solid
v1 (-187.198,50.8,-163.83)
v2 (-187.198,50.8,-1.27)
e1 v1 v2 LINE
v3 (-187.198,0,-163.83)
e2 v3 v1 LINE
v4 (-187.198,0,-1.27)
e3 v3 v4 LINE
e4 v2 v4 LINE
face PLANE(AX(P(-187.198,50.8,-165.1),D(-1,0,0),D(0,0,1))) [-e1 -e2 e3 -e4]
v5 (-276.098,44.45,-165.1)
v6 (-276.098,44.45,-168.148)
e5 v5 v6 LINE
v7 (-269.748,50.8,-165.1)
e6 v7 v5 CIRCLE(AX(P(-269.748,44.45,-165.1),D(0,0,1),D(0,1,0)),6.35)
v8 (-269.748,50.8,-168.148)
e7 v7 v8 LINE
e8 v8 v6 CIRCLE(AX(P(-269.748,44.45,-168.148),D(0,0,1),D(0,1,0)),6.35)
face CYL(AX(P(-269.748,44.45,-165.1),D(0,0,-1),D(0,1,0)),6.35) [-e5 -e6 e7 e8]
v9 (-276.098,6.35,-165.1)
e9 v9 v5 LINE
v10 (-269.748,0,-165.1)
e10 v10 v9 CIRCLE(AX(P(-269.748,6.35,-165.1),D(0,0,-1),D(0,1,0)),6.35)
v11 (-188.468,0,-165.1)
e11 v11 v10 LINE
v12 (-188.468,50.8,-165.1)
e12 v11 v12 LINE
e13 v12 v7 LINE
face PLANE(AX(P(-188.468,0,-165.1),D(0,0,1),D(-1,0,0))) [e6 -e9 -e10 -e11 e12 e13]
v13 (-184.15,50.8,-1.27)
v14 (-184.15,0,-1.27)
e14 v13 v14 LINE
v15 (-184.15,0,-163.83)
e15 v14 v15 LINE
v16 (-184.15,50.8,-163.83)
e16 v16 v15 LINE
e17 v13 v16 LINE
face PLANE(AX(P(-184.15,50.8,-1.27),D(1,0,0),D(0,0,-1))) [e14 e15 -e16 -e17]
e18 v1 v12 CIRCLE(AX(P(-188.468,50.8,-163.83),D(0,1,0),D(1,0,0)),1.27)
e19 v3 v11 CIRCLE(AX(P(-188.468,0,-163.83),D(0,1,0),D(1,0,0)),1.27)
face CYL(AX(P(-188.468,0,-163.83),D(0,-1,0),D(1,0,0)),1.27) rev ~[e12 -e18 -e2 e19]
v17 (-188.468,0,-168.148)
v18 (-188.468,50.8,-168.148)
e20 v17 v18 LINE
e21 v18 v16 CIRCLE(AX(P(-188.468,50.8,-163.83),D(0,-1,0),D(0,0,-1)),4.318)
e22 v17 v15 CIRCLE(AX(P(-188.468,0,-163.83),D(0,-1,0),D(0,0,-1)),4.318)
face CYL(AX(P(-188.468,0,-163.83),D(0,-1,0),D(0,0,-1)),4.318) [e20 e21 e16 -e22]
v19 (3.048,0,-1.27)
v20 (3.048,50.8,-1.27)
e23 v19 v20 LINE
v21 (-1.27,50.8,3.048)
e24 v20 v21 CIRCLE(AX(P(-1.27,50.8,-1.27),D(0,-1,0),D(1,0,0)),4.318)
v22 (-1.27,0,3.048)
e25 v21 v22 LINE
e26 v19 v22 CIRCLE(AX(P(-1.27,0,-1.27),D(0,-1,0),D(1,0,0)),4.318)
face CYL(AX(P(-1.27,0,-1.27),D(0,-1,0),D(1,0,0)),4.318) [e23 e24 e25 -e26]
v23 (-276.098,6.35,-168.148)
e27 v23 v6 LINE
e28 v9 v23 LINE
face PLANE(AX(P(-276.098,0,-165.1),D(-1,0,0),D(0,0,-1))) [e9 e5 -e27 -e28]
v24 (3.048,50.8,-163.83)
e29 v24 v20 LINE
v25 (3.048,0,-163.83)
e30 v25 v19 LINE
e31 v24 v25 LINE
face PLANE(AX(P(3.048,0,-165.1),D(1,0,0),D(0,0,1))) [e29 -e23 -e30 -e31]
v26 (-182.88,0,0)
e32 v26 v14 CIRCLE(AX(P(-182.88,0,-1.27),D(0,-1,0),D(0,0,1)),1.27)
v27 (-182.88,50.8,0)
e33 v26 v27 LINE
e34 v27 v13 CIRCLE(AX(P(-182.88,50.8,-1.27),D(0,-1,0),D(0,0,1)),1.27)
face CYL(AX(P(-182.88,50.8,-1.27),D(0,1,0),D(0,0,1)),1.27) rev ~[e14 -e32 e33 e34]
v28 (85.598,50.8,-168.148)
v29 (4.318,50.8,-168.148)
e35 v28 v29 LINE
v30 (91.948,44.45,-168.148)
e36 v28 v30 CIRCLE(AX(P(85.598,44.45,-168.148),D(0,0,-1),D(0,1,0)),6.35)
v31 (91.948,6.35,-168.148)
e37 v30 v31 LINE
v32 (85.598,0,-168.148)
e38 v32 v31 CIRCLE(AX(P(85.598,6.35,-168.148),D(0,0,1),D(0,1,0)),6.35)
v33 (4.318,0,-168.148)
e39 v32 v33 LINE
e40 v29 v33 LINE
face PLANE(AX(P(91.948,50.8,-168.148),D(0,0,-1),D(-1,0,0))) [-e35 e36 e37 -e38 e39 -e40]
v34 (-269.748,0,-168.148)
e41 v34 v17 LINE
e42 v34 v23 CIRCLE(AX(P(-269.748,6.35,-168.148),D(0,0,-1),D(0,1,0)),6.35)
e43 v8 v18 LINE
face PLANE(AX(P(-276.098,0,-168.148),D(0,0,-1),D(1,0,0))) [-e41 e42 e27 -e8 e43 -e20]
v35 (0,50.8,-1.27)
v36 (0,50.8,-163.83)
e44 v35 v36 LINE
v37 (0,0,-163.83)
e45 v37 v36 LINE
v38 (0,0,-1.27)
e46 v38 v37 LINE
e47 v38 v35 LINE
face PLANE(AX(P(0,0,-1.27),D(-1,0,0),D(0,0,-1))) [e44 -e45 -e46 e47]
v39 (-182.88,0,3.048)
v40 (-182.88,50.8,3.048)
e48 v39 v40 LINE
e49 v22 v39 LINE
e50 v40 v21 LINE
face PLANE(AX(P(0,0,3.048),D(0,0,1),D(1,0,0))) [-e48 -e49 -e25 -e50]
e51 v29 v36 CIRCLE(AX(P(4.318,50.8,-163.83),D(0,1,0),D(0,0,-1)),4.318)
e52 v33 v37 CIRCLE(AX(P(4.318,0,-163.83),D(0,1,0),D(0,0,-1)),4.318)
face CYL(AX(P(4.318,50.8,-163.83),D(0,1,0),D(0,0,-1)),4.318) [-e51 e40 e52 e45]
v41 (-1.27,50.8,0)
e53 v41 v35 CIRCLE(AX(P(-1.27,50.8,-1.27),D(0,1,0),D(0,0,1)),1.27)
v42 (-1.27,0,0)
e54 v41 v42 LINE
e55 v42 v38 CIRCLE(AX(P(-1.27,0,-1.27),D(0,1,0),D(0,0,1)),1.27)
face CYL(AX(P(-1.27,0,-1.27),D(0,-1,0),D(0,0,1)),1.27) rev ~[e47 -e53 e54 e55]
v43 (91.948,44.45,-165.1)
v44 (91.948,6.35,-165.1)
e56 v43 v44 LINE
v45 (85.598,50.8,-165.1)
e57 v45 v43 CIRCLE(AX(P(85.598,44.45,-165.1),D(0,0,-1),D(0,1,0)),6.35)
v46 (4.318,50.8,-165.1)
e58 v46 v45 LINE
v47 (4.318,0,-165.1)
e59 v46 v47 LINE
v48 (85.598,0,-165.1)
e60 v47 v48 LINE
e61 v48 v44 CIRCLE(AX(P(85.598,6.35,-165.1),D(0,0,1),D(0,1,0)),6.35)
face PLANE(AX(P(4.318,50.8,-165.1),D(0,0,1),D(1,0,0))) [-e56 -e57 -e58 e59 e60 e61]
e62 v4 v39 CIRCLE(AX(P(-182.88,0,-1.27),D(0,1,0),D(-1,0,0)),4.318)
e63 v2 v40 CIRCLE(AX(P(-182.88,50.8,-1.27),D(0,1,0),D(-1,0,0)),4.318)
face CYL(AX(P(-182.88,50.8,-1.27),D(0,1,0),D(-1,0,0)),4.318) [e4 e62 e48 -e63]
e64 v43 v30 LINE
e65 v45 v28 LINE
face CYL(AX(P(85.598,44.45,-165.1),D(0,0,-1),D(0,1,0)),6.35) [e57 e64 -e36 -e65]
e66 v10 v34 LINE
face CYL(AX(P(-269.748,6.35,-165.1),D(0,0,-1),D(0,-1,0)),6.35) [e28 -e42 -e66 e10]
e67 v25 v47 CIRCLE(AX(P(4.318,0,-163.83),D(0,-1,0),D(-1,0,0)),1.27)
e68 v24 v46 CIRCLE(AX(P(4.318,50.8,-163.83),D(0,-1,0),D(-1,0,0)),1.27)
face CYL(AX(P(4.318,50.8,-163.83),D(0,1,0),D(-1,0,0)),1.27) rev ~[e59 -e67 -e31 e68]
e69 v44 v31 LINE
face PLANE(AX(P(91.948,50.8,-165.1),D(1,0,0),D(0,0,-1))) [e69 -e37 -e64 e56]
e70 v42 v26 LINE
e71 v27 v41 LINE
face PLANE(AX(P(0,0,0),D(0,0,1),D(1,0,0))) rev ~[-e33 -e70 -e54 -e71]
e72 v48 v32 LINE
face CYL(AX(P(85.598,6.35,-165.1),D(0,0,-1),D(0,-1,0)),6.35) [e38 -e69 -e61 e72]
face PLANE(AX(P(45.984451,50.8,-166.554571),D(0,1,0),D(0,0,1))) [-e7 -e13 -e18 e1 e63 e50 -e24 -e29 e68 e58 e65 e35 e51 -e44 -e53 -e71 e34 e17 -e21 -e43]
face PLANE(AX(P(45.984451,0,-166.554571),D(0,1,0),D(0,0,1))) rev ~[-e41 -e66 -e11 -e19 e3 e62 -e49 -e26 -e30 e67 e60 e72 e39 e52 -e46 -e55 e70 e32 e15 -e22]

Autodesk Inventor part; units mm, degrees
ref_plane "YZ Plane" through (0, 0, 0) normal (1, 0, 0) x (0, 1, 0)
ref_plane "XZ Plane" through (0, 0, 0) normal (0, 1, 0) x (-1, 0, 0)
ref_plane "XY Plane" through (0, 0, 0) normal (0, 0, 1) x (1, 0, 0)
sketch "Sketch1" plane through (0, 0, 0) normal (0, 0, 1) x (1, 0, 0)
  line L0 (0, 0) -> (-184.15, 0)
  line L1 (-184.15, 0) -> (-184.15, 50.8)
  line L2 (-184.15, 50.8) -> (0, 50.8)
  line L3 (0, 50.8) -> (0, 0)
  dimension "d0" = 184.15
  dimension "d1" = 50.8
extrude "Plate1" add sketch "Sketch1" along normal blind 3.048
sketch "Sketch2" plane through (0, 0, 0) normal (1, 0, 0) x (0, 1, 0)
  line L0 (50.8, 0) -> (0, 0)
  line L1 (0, 0) -> (0, -165.1)
  line L2 (0, -165.1) -> (50.8, -165.1)
  line L3 (50.8, -165.1) -> (50.8, 0)
edge flange "Flange1" height 165.1 angle 90 thickness 3.048 bend radius 1.27 thickness toward (1, 0, 0) relief tear relief width 3.048 relief depth 1.524 corner gap 3.048 corner form 0 edges at (0, 25.4, 0) (-184.15, 25.4, 0) wall of the first edge with corners at (0, 50.8, 0) (0, 0, 0) (0, 0, -165.1) (0, 50.8, -165.1)
bend "Bend1"
corner "Corner1"
sketch "Sketch3" plane through (3.048, 50.8, -165.1) normal (0, 0, -1) x (-1, 0, 0)
  line L0 (0, -50.8) -> (0, 0)
  line L1 (0, 0) -> (-88.9, 0)
  line L2 (-88.9, 0) -> (-88.9, -50.8)
  line L3 (-88.9, -50.8) -> (0, -50.8)
edge flange "Flange2" height 88.9 angle 90 thickness 3.048 bend radius 1.27 thickness toward (0, 0, -1) relief tear relief width 3.048 relief depth 1.524 corner gap 3.048 corner form 0 edges at (3.048, 25.4, -165.1) (-187.198, 25.4, -165.1) wall of the first edge with corners at (3.048, 0, -165.1) (3.048, 50.8, -165.1) (91.948, 50.8, -165.1) (91.948, 0, -165.1)
bend "Bend2"
corner "Corner2"
fillet "Corner Round1" radius 6.35 4 edges at (-276.098, 0, -166.624) (-276.098, 50.8, -166.624) (91.948, 0, -166.624) (91.948, 50.8, -166.624)
equation "\"d3\" = BendReliefWidth"
equation "\"d4\" = BendReliefDepth"
equation "\"d5\" = MinimumRemnant"
equation "\"d6\" = BendRadius"
equation "\"d10\" = CornerReliefSize"
equation "\"d11\" = GapSize"
equation "\"d12\" = JacobiRadiusSize"
equation "\"d13\" = BendReliefWidth"
equation "\"d14\" = BendReliefDepth"
equation "\"d15\" = MinimumRemnant"
equation "\"d16\" = BendRadius"
equation "\"d20\" = CornerReliefSize"
equation "\"d21\" = GapSize"
equation "\"d22\" = JacobiRadiusSize"
equation "\"BendRadius\" = Thickness"
equation "\"BendReliefWidth\" = Thickness"
equation "\"BendReliefDepth\" = 0.5 * Thickness"
equation "\"CornerReliefSize\" = 4 * Thickness"
equation "\"MinimumRemnant\" = 2 * Thickness"
equation "\"TransitionRadius\" = BendRadius"
equation "\"JacobiRadiusSize\" = BendRadius"
equation "\"GapSize\" = Thickness"
equation "\"d2\" = BendRadius"
equation "\"Thickness\" = 3.048"
properties part number "battery staple"
